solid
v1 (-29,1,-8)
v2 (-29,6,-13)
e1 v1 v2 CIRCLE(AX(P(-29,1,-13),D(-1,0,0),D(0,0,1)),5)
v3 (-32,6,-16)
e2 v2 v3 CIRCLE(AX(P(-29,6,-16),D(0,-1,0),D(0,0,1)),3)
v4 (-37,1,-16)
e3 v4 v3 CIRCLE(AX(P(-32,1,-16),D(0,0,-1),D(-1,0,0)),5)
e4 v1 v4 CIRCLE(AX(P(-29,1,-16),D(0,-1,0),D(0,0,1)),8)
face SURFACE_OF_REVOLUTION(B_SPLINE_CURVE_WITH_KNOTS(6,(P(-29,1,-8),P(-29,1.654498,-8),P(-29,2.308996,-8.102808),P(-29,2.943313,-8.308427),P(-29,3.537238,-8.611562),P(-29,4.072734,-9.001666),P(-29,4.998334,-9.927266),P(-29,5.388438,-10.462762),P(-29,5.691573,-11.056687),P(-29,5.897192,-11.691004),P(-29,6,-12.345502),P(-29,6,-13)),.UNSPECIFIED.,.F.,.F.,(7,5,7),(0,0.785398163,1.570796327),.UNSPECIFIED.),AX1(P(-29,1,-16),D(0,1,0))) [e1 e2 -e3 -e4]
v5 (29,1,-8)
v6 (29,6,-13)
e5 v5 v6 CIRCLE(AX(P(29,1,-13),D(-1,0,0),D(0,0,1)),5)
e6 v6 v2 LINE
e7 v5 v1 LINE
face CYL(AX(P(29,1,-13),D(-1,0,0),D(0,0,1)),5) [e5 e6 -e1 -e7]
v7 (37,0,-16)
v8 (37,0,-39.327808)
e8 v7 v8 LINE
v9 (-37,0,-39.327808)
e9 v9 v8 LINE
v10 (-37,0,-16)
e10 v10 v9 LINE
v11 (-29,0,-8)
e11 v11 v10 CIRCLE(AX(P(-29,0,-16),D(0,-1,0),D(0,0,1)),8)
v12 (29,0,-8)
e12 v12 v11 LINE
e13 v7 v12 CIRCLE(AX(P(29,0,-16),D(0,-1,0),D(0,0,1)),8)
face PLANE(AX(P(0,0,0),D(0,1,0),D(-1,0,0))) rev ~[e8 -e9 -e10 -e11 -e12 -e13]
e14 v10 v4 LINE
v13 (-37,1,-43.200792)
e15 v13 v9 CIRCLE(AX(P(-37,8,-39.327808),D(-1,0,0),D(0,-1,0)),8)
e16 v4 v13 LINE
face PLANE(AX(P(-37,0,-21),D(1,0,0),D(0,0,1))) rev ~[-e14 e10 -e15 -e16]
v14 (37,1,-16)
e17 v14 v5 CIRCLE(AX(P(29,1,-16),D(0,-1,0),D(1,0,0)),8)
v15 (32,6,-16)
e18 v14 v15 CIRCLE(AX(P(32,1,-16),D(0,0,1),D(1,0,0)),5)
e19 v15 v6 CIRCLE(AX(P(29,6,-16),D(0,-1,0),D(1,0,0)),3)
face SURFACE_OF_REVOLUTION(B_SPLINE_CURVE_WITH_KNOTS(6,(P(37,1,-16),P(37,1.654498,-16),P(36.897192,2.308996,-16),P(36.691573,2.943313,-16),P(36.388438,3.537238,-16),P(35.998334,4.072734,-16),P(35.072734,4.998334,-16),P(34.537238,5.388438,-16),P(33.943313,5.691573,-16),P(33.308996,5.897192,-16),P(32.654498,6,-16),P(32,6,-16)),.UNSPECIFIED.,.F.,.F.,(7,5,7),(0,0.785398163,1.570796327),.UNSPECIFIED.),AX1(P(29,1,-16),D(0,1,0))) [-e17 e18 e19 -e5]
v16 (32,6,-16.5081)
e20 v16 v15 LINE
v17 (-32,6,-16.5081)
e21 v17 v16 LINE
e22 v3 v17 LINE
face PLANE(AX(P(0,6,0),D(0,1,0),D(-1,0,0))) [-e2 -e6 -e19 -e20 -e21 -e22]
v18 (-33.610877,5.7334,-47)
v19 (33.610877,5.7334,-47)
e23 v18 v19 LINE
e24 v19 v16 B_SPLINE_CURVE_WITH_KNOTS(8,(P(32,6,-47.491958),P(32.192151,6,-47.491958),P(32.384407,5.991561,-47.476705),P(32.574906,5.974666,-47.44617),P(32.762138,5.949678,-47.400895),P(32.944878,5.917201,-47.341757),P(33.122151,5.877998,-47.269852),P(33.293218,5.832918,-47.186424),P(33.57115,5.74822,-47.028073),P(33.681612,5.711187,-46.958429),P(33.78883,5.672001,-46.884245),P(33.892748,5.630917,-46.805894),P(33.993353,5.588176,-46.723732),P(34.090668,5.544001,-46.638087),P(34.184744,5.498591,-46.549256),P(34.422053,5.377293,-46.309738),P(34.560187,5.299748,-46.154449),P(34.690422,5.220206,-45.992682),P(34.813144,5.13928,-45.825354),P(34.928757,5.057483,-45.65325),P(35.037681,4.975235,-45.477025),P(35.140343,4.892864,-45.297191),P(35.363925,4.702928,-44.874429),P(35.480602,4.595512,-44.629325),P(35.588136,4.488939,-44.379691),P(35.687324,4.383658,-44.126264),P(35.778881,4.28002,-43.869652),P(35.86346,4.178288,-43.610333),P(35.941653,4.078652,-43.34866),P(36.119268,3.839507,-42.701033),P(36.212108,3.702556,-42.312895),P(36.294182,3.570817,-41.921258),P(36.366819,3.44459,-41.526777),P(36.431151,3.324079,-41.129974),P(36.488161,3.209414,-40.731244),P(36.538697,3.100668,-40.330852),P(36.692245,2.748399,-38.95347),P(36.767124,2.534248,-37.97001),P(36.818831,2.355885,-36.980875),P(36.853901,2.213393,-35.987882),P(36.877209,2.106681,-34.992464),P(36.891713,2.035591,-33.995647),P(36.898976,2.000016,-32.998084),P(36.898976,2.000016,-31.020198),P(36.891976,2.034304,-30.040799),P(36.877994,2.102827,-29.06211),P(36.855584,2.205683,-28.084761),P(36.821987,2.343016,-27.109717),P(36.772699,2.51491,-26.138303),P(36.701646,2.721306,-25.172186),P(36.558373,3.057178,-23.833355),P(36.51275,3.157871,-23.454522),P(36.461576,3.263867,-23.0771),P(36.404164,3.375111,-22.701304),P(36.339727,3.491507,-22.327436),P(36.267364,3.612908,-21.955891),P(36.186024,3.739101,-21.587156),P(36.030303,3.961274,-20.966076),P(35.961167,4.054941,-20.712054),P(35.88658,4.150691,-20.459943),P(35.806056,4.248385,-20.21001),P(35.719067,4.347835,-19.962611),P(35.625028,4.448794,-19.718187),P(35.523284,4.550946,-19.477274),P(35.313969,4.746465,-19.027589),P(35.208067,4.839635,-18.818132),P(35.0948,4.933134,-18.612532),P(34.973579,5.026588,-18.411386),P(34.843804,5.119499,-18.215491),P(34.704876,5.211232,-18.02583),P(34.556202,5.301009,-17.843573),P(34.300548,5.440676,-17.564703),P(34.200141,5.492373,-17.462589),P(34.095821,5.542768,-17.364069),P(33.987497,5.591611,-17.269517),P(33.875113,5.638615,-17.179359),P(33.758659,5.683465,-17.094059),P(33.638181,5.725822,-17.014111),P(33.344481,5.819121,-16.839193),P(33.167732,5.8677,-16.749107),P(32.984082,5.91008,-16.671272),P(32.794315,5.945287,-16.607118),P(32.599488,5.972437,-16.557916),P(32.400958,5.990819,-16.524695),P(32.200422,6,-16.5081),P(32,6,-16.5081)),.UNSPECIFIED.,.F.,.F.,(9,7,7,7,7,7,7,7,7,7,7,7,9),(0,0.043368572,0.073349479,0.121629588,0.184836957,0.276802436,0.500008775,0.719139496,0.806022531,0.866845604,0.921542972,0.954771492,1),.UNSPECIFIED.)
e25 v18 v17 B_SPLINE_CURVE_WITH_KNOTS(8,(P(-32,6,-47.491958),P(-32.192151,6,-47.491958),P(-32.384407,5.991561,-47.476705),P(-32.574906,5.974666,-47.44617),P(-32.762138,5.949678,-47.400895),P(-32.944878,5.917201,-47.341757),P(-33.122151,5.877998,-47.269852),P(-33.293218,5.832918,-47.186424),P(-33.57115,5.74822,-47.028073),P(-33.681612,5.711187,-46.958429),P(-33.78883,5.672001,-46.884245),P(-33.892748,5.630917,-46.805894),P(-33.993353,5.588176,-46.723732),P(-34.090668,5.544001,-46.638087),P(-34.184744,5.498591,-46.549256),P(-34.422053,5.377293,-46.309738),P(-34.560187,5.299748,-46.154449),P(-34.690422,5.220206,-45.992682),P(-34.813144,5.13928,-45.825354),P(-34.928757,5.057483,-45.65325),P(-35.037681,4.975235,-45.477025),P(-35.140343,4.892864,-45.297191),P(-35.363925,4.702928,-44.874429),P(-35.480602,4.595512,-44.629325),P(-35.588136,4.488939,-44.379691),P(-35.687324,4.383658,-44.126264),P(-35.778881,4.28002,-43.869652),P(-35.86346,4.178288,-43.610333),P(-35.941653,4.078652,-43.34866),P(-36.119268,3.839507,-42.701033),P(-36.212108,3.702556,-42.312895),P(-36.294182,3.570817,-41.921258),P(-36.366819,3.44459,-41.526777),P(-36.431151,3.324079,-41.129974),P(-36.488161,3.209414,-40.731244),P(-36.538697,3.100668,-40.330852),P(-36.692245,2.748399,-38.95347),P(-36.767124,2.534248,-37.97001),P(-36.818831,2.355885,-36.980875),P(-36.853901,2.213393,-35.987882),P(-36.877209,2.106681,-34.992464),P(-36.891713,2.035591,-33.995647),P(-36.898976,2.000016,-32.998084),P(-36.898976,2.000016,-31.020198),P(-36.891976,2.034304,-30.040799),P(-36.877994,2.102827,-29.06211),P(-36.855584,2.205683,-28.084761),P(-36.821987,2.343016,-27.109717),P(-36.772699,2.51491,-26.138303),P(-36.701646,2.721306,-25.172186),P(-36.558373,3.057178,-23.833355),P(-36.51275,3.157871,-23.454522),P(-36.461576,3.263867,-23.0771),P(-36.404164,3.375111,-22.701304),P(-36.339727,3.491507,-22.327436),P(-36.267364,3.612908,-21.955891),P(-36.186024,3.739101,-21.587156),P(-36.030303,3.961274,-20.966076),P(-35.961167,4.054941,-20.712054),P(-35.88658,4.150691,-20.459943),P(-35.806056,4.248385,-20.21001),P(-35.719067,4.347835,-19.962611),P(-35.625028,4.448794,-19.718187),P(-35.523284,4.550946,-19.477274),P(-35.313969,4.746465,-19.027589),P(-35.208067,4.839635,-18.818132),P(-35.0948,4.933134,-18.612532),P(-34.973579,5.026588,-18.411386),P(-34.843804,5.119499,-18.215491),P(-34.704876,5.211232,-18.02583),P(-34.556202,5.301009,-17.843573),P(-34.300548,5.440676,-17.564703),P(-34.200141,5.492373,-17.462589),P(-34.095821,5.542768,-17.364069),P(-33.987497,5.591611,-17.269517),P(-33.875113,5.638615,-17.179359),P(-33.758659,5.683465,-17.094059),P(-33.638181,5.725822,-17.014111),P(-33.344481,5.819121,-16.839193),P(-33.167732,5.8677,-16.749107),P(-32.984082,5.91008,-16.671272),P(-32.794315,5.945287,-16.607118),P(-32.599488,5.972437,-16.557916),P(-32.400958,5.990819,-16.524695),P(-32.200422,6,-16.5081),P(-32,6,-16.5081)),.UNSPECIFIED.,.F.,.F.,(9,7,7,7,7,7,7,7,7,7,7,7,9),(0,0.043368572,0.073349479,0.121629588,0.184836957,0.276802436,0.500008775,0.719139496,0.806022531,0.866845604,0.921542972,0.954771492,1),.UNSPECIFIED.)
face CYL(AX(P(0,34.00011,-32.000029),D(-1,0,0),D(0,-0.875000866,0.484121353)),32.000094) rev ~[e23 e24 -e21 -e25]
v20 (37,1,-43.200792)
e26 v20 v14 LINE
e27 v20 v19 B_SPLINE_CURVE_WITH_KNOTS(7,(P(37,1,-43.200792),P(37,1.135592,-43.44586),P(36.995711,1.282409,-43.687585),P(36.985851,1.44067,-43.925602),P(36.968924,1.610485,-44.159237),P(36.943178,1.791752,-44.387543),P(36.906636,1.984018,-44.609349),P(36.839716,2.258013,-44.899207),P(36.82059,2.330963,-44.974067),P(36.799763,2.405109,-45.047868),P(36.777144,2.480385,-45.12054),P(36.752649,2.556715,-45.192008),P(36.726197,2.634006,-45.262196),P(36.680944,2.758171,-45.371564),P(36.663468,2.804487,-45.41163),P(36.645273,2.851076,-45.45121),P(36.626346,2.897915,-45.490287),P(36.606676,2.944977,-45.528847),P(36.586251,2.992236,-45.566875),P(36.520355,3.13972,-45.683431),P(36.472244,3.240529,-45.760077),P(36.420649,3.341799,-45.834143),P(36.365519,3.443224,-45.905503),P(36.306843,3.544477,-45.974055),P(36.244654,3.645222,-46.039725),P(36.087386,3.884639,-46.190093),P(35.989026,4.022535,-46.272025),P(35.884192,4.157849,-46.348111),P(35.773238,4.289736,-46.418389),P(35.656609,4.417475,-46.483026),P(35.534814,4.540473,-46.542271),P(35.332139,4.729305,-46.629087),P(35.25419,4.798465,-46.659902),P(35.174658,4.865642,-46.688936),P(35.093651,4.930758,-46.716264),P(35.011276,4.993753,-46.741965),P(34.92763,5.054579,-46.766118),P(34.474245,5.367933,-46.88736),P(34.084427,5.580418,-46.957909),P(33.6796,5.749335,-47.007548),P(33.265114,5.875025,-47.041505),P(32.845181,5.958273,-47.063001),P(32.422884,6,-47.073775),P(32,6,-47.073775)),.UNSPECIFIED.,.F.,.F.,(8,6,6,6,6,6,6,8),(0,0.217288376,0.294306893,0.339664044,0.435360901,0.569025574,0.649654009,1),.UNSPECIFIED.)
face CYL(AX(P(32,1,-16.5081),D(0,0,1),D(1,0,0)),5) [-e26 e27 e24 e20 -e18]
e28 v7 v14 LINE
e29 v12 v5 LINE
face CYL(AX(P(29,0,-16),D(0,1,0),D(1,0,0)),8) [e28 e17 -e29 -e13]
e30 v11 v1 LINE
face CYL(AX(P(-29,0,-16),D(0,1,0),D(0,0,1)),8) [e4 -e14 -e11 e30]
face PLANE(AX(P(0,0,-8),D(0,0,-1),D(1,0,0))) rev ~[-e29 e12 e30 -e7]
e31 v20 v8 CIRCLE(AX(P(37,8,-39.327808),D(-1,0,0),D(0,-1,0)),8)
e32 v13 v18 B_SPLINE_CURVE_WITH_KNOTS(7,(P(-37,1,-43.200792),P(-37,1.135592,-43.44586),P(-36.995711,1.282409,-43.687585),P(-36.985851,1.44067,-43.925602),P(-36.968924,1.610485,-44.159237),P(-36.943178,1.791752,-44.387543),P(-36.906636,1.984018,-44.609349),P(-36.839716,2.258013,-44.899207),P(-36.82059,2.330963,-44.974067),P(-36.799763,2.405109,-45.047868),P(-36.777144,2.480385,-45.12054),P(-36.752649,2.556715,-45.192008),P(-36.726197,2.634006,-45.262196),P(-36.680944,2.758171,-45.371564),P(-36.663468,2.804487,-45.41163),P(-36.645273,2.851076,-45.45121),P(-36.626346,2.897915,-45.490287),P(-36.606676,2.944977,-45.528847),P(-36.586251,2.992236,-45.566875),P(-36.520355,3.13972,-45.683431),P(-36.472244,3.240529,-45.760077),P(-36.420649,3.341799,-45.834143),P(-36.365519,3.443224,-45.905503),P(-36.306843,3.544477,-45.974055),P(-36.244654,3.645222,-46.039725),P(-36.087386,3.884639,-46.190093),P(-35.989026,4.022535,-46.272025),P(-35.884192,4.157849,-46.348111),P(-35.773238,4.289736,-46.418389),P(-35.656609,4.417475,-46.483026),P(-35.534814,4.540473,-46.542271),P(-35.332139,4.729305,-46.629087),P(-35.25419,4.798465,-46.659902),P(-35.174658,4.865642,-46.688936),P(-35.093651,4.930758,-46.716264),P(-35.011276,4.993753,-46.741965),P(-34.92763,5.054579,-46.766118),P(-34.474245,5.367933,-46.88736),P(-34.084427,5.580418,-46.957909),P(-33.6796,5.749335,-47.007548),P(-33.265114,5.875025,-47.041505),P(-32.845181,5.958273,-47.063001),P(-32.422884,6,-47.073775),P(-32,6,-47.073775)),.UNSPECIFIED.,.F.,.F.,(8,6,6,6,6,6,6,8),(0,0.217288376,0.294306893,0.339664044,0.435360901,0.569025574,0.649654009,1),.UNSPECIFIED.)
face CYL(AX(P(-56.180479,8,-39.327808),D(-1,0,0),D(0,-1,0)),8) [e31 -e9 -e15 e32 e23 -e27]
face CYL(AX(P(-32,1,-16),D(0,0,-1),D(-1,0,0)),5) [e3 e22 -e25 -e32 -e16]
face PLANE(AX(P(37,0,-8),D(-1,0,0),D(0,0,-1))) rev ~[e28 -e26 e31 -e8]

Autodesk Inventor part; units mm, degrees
ref_plane "YZ Plane" through (0, 0, 0) normal (1, 0, 0) x (0, 1, 0)
ref_plane "XZ Plane" through (0, 0, 0) normal (0, 1, 0) x (-1, 0, 0)
ref_plane "XY Plane" through (0, 0, 0) normal (0, 0, 1) x (1, 0, 0)
sketch "Sketch1" plane through (0, 0, 0) normal (0, 1, 0) x (-1, 0, 0)
  line L0 (25.9, 0) -> (-25.9, 0) projected
  line L1 (0, -25.9) -> (0, 25.9) projected
  circle A0 centre (0, 0) radius 18.5 construction
  circle A1 centre (0, 0) radius 13 construction
  dimension "d0" = 37
  dimension "d1" = 26
sketch "Sketch2" plane through (0, 0, 0) normal (0, 1, 0) x (-1, 0, 0)
  line L0 (0, -28.9) -> (0, 26.4) projected
  line L1 (-37, -8) -> (-37, -21)
  line L2 (-37, -21) -> (37, -21)
  line L3 (37, -21) -> (37, -8)
  line L4 (37, -8) -> (-37, -8)
  line L5 (-51.8, 0) -> (51.8, 0) projected
  point P0 (0, 0)
  dimension "d3" = 74
  dimension "d99" = 8
  dimension "d101" = 21
extrude "Extrusion1" add sketch "Sketch2" along normal blind 6
sketch "Sketch6" plane through (0, 0, 0) normal (0, 1, 0) x (-1, 0, 0)
  line L0 (37, -21) -> (-37, -21) projected
  line L1 (37, -8) -> (37, -21) projected
  line L2 (-37, -21) -> (37, -21)
  line L3 (37, -21) -> (37, -8)
  line L4 (-37, -8) -> (-37, -21)
  line L5 (58.8, 0) -> (-58.8, 0) projected
  line L6 (0, -28.9) -> (0, 26.4) projected
  arc A0 (-16, 0) -> (16, 0) centre (0, 0) ccw
  line L7 (16, 0) -> (16, 0)
  line L8 (37, 0) -> (-37, 0) projected
  line L9 (16, 0) -> (37, 0)
  line L10 (-16, 0) -> (-16, 0)
  line L11 (-16, 0) -> (-37, 0)
  point P0 (-17.3617, -21)
  dimension "d18" = 32
extrude "Extrusion5" [suppressed]
sketch "Sketch4" plane through (0, 0, 0) normal (0, 0, 1) x (1, 0, 0)
  line L0 (-18.5, 0) -> (18.5, 0)
  line L1 (18.5, 0) -> (18.5, -2)
  line L2 (18.5, -2) -> (-18.5, -2)
  line L3 (-18.5, -2) -> (-18.5, 0)
  line L4 (-25.9, 0) -> (25.9, 0) projected
  line L5 (0, -2.4) -> (0, 0.4) projected
  point P0 (0, 0)
  dimension "d10" = 37
  dimension "d11" = 2
extrude "Extrusion6" [suppressed]
sketch "Sketch5" plane through (0, 0, 0) normal (0, 1, 0) x (-1, 0, 0)
  circle A0 centre (0, 0) radius 18.5 construction
  circle A1 centre (0, 0) radius 18.5 construction
  line L0 (25.9, 0) -> (-25.9, 0) projected
  line L1 (0, -28.9) -> (0, 26.4) projected
  line L2 (-18.5, -21) -> (18.5, -21)
  line L3 (18.5, -21) -> (18.5, -18.5)
  line L4 (18.5, -18.5) -> (-18.5, -18.5)
  line L5 (-18.5, -18.5) -> (-18.5, -21)
  dimension "d25" = 37
  dimension "d26" = 21
extrude "Extrusion7" [suppressed]
sketch "Sketch7" plane through (0, 0, 0) normal (0, 0, 1) x (1, 0, 0)
  line L0 (-18.5, 0) -> (18.5, 0)
  line L1 (18.5, 0) -> (18.5, -2)
  line L2 (18.5, -2) -> (-18.5, -2)
  line L3 (-18.5, -2) -> (-18.5, 0)
  line L4 (37, 0) -> (-37, 0) projected
  line L5 (-58.8, 0) -> (58.8, 0) projected
  line L6 (0, -2.4) -> (0, 0.4) projected
  point P0 (-16, 0)
  point P1 (16, 0)
  dimension "d53" = 2
  dimension "d54" = 18.5
extrude "Extrusion8" [suppressed]
sketch "Sketch8" plane through (0, 0, 0) normal (0, 1, 0) x (-1, 0, 0)
  circle A0 centre (0, 0) radius 12.75
  dimension "d34" = 25.5
extrude "Extrusion9" [suppressed]
pattern_linear "Rectangular Pattern1" [suppressed]
sketch "Sketch9" plane through (0, 6, 0) normal (0, 1, 0) x (1, 0, 0)
  circle A0 centre (0, 0) radius 13
  circle A1 centre (0, 0) radius 15
  dimension "d40" = 26
  dimension "d41" = 30
extrude "Extrusion10" [suppressed]
sketch "Sketch10" plane through (0, 5, 0) normal (0, 1, 0) x (1, 0, 0)
  arc A0 (16, 0) -> (-16, 0) centre (0, 0) ccw projected
  line L0 (1.5, -18) -> (-1.5, -18)
  line L1 (-29.4, 0) -> (29.4, 0) projected
  line L2 (0, 36.3) -> (0, -70.8) projected
  line L3 (1.5, -12) -> (-1.5, -12)
  line L4 (1.5, -12) -> (1.5, -18)
  line L5 (-1.5, -18) -> (-1.5, -12)
  dimension "d48" = 3
  dimension "d49" = 12
  dimension "d50" = 6
extrude "Extrusion11" [suppressed]
fillet "Fillet1" [suppressed]
sketch "Sketch11" plane through (0, 0, 0) normal (0, 1, 0) x (-1, 0, 0)
  line L0 (-37, -21) -> (37, -21)
  line L1 (37, -21) -> (37, -47)
  line L2 (37, -47) -> (-37, -47)
  line L3 (-37, -47) -> (-37, -21)
  line L4 (58.8, 0) -> (-58.8, 0) projected
  line L5 (0, -60.1) -> (0, 31.6) projected
  point P0 (0, 0)
  dimension "d57" = 26
  dimension "d58" = 21
  dimension "d59" = 74
extrude "Extrusion12" add sketch "Sketch11" along normal blind 6
sketch "Sketch12" plane through (0, 0, 0) normal (1, 0, 0) x (0, 1, 0)
  line L0 (6, -8) -> (6, -47) projected
  arc A0 (6, -16.5081) -> (5.7334, -47) centre (34, -32) ccw
  line L1 (-6.8, 0) -> (40.8, 0) projected
  line L2 (0, -66) -> (0, 67) projected
  line L3 (6, -16.5081) -> (6, -47)
  line L4 (6, -47) -> (5.7334, -47)
  line L5 (0, -47) -> (6, -47) projected
  point P0 (0, 0)
  point P1 (6, 48)
  dimension "d62" = 32
  dimension "d63" = 32
  dimension "d64" = 34
extrude "Extrusion13" cut sketch "Sketch12" along normal through all both and the other way through all
fillet "Fillet3" radius 8 1 edges at (0, 0, -47)
sketch "Sketch13" plane through (0, 0, 0) normal (0, 1, 0) x (-1, 0, 0)
  line L0 (61.5, 0) -> (-75, 0) projected
  line L1 (0, -57.9802) -> (0, 72.5866) projected
  line L2 (37, -8) -> (37, -39.3278) projected
  arc A0 (13.0815, 23.9185) -> (13.0815, 13.0815) centre (18.5, 18.5) ccw
  line L3 (-37, -8) -> (-37, -16.5081) projected
  arc A1 (-13.0815, 13.0815) -> (-13.0815, 23.9185) centre (-18.5, 18.5) ccw
  line L4 (18.5, 37) -> (18.5, 0)
  line L5 (-18.5, 0) -> (-18.5, 37)
  line L6 (18.5, 37) -> (18.5, -8)
  line L7 (-37, 0) -> (37, 0) projected
  line L8 (-18.5, -8) -> (-18.5, 37)
  arc A2 (-9.2871, 53) -> (-13.0815, 23.9185) centre (0, 37) ccw
  arc A3 (13.0815, 23.9185) -> (9.2871, 53) centre (0, 37) ccw
  arc A4 (-13.0815, 13.0815) -> (-18.5, 0) centre (0, 0) ccw
  arc A5 (18.5, 0) -> (13.0815, 13.0815) centre (0, 0) ccw
  point P0 (37, -39.3278)
  point P1 (-55.5, 48)
  point P2 (-37, -16.5081)
  dimension "d68" = 37
  dimension "d71" = 18.5
  dimension "d72" = 18.5
  dimension "d73" = 7.663
  dimension "d74" = 7.663
  dimension "d75" = 18.5
  dimension "d76" = 18.5
  dimension "d77" = 18.5
  dimension "d78" = 18.5
extrude "Extrusion14" [suppressed]
sketch "Sketch14" plane through (0, 0, 0) normal (0, 1, 0) x (-1, 0, 0)
  circle A0 centre (18.5, 18.5) radius 10
  line L0 (39.9, 0) -> (-39.9, 0) projected
  line L1 (0, -27.9) -> (0, 37.9) projected
  circle A1 centre (-18.5, 18.5) radius 10
  point P0 (0, 0)
  dimension "d84" = 18.5
  dimension "d85" = 18.5
  dimension "d86" = 20
  dimension "d89" = 37
extrude "Extrusion15" [suppressed]
fillet "Fillet4" [suppressed]
fillet "Fillet5" radius 8 2 edges at (-37, 3, -8) (37, 3, -8)
fillet "Fillet6" radius 5 5 edges at (34.6569, 6, -10.3431) (37, 6, -16.254) (-34.6569, 6, -10.3431) (-37, 6, -16.254) (0, 6, -8)
equation "\"d85\" = d84"
properties part number "NespressoSpeedfiller-6X-long-scraper"
